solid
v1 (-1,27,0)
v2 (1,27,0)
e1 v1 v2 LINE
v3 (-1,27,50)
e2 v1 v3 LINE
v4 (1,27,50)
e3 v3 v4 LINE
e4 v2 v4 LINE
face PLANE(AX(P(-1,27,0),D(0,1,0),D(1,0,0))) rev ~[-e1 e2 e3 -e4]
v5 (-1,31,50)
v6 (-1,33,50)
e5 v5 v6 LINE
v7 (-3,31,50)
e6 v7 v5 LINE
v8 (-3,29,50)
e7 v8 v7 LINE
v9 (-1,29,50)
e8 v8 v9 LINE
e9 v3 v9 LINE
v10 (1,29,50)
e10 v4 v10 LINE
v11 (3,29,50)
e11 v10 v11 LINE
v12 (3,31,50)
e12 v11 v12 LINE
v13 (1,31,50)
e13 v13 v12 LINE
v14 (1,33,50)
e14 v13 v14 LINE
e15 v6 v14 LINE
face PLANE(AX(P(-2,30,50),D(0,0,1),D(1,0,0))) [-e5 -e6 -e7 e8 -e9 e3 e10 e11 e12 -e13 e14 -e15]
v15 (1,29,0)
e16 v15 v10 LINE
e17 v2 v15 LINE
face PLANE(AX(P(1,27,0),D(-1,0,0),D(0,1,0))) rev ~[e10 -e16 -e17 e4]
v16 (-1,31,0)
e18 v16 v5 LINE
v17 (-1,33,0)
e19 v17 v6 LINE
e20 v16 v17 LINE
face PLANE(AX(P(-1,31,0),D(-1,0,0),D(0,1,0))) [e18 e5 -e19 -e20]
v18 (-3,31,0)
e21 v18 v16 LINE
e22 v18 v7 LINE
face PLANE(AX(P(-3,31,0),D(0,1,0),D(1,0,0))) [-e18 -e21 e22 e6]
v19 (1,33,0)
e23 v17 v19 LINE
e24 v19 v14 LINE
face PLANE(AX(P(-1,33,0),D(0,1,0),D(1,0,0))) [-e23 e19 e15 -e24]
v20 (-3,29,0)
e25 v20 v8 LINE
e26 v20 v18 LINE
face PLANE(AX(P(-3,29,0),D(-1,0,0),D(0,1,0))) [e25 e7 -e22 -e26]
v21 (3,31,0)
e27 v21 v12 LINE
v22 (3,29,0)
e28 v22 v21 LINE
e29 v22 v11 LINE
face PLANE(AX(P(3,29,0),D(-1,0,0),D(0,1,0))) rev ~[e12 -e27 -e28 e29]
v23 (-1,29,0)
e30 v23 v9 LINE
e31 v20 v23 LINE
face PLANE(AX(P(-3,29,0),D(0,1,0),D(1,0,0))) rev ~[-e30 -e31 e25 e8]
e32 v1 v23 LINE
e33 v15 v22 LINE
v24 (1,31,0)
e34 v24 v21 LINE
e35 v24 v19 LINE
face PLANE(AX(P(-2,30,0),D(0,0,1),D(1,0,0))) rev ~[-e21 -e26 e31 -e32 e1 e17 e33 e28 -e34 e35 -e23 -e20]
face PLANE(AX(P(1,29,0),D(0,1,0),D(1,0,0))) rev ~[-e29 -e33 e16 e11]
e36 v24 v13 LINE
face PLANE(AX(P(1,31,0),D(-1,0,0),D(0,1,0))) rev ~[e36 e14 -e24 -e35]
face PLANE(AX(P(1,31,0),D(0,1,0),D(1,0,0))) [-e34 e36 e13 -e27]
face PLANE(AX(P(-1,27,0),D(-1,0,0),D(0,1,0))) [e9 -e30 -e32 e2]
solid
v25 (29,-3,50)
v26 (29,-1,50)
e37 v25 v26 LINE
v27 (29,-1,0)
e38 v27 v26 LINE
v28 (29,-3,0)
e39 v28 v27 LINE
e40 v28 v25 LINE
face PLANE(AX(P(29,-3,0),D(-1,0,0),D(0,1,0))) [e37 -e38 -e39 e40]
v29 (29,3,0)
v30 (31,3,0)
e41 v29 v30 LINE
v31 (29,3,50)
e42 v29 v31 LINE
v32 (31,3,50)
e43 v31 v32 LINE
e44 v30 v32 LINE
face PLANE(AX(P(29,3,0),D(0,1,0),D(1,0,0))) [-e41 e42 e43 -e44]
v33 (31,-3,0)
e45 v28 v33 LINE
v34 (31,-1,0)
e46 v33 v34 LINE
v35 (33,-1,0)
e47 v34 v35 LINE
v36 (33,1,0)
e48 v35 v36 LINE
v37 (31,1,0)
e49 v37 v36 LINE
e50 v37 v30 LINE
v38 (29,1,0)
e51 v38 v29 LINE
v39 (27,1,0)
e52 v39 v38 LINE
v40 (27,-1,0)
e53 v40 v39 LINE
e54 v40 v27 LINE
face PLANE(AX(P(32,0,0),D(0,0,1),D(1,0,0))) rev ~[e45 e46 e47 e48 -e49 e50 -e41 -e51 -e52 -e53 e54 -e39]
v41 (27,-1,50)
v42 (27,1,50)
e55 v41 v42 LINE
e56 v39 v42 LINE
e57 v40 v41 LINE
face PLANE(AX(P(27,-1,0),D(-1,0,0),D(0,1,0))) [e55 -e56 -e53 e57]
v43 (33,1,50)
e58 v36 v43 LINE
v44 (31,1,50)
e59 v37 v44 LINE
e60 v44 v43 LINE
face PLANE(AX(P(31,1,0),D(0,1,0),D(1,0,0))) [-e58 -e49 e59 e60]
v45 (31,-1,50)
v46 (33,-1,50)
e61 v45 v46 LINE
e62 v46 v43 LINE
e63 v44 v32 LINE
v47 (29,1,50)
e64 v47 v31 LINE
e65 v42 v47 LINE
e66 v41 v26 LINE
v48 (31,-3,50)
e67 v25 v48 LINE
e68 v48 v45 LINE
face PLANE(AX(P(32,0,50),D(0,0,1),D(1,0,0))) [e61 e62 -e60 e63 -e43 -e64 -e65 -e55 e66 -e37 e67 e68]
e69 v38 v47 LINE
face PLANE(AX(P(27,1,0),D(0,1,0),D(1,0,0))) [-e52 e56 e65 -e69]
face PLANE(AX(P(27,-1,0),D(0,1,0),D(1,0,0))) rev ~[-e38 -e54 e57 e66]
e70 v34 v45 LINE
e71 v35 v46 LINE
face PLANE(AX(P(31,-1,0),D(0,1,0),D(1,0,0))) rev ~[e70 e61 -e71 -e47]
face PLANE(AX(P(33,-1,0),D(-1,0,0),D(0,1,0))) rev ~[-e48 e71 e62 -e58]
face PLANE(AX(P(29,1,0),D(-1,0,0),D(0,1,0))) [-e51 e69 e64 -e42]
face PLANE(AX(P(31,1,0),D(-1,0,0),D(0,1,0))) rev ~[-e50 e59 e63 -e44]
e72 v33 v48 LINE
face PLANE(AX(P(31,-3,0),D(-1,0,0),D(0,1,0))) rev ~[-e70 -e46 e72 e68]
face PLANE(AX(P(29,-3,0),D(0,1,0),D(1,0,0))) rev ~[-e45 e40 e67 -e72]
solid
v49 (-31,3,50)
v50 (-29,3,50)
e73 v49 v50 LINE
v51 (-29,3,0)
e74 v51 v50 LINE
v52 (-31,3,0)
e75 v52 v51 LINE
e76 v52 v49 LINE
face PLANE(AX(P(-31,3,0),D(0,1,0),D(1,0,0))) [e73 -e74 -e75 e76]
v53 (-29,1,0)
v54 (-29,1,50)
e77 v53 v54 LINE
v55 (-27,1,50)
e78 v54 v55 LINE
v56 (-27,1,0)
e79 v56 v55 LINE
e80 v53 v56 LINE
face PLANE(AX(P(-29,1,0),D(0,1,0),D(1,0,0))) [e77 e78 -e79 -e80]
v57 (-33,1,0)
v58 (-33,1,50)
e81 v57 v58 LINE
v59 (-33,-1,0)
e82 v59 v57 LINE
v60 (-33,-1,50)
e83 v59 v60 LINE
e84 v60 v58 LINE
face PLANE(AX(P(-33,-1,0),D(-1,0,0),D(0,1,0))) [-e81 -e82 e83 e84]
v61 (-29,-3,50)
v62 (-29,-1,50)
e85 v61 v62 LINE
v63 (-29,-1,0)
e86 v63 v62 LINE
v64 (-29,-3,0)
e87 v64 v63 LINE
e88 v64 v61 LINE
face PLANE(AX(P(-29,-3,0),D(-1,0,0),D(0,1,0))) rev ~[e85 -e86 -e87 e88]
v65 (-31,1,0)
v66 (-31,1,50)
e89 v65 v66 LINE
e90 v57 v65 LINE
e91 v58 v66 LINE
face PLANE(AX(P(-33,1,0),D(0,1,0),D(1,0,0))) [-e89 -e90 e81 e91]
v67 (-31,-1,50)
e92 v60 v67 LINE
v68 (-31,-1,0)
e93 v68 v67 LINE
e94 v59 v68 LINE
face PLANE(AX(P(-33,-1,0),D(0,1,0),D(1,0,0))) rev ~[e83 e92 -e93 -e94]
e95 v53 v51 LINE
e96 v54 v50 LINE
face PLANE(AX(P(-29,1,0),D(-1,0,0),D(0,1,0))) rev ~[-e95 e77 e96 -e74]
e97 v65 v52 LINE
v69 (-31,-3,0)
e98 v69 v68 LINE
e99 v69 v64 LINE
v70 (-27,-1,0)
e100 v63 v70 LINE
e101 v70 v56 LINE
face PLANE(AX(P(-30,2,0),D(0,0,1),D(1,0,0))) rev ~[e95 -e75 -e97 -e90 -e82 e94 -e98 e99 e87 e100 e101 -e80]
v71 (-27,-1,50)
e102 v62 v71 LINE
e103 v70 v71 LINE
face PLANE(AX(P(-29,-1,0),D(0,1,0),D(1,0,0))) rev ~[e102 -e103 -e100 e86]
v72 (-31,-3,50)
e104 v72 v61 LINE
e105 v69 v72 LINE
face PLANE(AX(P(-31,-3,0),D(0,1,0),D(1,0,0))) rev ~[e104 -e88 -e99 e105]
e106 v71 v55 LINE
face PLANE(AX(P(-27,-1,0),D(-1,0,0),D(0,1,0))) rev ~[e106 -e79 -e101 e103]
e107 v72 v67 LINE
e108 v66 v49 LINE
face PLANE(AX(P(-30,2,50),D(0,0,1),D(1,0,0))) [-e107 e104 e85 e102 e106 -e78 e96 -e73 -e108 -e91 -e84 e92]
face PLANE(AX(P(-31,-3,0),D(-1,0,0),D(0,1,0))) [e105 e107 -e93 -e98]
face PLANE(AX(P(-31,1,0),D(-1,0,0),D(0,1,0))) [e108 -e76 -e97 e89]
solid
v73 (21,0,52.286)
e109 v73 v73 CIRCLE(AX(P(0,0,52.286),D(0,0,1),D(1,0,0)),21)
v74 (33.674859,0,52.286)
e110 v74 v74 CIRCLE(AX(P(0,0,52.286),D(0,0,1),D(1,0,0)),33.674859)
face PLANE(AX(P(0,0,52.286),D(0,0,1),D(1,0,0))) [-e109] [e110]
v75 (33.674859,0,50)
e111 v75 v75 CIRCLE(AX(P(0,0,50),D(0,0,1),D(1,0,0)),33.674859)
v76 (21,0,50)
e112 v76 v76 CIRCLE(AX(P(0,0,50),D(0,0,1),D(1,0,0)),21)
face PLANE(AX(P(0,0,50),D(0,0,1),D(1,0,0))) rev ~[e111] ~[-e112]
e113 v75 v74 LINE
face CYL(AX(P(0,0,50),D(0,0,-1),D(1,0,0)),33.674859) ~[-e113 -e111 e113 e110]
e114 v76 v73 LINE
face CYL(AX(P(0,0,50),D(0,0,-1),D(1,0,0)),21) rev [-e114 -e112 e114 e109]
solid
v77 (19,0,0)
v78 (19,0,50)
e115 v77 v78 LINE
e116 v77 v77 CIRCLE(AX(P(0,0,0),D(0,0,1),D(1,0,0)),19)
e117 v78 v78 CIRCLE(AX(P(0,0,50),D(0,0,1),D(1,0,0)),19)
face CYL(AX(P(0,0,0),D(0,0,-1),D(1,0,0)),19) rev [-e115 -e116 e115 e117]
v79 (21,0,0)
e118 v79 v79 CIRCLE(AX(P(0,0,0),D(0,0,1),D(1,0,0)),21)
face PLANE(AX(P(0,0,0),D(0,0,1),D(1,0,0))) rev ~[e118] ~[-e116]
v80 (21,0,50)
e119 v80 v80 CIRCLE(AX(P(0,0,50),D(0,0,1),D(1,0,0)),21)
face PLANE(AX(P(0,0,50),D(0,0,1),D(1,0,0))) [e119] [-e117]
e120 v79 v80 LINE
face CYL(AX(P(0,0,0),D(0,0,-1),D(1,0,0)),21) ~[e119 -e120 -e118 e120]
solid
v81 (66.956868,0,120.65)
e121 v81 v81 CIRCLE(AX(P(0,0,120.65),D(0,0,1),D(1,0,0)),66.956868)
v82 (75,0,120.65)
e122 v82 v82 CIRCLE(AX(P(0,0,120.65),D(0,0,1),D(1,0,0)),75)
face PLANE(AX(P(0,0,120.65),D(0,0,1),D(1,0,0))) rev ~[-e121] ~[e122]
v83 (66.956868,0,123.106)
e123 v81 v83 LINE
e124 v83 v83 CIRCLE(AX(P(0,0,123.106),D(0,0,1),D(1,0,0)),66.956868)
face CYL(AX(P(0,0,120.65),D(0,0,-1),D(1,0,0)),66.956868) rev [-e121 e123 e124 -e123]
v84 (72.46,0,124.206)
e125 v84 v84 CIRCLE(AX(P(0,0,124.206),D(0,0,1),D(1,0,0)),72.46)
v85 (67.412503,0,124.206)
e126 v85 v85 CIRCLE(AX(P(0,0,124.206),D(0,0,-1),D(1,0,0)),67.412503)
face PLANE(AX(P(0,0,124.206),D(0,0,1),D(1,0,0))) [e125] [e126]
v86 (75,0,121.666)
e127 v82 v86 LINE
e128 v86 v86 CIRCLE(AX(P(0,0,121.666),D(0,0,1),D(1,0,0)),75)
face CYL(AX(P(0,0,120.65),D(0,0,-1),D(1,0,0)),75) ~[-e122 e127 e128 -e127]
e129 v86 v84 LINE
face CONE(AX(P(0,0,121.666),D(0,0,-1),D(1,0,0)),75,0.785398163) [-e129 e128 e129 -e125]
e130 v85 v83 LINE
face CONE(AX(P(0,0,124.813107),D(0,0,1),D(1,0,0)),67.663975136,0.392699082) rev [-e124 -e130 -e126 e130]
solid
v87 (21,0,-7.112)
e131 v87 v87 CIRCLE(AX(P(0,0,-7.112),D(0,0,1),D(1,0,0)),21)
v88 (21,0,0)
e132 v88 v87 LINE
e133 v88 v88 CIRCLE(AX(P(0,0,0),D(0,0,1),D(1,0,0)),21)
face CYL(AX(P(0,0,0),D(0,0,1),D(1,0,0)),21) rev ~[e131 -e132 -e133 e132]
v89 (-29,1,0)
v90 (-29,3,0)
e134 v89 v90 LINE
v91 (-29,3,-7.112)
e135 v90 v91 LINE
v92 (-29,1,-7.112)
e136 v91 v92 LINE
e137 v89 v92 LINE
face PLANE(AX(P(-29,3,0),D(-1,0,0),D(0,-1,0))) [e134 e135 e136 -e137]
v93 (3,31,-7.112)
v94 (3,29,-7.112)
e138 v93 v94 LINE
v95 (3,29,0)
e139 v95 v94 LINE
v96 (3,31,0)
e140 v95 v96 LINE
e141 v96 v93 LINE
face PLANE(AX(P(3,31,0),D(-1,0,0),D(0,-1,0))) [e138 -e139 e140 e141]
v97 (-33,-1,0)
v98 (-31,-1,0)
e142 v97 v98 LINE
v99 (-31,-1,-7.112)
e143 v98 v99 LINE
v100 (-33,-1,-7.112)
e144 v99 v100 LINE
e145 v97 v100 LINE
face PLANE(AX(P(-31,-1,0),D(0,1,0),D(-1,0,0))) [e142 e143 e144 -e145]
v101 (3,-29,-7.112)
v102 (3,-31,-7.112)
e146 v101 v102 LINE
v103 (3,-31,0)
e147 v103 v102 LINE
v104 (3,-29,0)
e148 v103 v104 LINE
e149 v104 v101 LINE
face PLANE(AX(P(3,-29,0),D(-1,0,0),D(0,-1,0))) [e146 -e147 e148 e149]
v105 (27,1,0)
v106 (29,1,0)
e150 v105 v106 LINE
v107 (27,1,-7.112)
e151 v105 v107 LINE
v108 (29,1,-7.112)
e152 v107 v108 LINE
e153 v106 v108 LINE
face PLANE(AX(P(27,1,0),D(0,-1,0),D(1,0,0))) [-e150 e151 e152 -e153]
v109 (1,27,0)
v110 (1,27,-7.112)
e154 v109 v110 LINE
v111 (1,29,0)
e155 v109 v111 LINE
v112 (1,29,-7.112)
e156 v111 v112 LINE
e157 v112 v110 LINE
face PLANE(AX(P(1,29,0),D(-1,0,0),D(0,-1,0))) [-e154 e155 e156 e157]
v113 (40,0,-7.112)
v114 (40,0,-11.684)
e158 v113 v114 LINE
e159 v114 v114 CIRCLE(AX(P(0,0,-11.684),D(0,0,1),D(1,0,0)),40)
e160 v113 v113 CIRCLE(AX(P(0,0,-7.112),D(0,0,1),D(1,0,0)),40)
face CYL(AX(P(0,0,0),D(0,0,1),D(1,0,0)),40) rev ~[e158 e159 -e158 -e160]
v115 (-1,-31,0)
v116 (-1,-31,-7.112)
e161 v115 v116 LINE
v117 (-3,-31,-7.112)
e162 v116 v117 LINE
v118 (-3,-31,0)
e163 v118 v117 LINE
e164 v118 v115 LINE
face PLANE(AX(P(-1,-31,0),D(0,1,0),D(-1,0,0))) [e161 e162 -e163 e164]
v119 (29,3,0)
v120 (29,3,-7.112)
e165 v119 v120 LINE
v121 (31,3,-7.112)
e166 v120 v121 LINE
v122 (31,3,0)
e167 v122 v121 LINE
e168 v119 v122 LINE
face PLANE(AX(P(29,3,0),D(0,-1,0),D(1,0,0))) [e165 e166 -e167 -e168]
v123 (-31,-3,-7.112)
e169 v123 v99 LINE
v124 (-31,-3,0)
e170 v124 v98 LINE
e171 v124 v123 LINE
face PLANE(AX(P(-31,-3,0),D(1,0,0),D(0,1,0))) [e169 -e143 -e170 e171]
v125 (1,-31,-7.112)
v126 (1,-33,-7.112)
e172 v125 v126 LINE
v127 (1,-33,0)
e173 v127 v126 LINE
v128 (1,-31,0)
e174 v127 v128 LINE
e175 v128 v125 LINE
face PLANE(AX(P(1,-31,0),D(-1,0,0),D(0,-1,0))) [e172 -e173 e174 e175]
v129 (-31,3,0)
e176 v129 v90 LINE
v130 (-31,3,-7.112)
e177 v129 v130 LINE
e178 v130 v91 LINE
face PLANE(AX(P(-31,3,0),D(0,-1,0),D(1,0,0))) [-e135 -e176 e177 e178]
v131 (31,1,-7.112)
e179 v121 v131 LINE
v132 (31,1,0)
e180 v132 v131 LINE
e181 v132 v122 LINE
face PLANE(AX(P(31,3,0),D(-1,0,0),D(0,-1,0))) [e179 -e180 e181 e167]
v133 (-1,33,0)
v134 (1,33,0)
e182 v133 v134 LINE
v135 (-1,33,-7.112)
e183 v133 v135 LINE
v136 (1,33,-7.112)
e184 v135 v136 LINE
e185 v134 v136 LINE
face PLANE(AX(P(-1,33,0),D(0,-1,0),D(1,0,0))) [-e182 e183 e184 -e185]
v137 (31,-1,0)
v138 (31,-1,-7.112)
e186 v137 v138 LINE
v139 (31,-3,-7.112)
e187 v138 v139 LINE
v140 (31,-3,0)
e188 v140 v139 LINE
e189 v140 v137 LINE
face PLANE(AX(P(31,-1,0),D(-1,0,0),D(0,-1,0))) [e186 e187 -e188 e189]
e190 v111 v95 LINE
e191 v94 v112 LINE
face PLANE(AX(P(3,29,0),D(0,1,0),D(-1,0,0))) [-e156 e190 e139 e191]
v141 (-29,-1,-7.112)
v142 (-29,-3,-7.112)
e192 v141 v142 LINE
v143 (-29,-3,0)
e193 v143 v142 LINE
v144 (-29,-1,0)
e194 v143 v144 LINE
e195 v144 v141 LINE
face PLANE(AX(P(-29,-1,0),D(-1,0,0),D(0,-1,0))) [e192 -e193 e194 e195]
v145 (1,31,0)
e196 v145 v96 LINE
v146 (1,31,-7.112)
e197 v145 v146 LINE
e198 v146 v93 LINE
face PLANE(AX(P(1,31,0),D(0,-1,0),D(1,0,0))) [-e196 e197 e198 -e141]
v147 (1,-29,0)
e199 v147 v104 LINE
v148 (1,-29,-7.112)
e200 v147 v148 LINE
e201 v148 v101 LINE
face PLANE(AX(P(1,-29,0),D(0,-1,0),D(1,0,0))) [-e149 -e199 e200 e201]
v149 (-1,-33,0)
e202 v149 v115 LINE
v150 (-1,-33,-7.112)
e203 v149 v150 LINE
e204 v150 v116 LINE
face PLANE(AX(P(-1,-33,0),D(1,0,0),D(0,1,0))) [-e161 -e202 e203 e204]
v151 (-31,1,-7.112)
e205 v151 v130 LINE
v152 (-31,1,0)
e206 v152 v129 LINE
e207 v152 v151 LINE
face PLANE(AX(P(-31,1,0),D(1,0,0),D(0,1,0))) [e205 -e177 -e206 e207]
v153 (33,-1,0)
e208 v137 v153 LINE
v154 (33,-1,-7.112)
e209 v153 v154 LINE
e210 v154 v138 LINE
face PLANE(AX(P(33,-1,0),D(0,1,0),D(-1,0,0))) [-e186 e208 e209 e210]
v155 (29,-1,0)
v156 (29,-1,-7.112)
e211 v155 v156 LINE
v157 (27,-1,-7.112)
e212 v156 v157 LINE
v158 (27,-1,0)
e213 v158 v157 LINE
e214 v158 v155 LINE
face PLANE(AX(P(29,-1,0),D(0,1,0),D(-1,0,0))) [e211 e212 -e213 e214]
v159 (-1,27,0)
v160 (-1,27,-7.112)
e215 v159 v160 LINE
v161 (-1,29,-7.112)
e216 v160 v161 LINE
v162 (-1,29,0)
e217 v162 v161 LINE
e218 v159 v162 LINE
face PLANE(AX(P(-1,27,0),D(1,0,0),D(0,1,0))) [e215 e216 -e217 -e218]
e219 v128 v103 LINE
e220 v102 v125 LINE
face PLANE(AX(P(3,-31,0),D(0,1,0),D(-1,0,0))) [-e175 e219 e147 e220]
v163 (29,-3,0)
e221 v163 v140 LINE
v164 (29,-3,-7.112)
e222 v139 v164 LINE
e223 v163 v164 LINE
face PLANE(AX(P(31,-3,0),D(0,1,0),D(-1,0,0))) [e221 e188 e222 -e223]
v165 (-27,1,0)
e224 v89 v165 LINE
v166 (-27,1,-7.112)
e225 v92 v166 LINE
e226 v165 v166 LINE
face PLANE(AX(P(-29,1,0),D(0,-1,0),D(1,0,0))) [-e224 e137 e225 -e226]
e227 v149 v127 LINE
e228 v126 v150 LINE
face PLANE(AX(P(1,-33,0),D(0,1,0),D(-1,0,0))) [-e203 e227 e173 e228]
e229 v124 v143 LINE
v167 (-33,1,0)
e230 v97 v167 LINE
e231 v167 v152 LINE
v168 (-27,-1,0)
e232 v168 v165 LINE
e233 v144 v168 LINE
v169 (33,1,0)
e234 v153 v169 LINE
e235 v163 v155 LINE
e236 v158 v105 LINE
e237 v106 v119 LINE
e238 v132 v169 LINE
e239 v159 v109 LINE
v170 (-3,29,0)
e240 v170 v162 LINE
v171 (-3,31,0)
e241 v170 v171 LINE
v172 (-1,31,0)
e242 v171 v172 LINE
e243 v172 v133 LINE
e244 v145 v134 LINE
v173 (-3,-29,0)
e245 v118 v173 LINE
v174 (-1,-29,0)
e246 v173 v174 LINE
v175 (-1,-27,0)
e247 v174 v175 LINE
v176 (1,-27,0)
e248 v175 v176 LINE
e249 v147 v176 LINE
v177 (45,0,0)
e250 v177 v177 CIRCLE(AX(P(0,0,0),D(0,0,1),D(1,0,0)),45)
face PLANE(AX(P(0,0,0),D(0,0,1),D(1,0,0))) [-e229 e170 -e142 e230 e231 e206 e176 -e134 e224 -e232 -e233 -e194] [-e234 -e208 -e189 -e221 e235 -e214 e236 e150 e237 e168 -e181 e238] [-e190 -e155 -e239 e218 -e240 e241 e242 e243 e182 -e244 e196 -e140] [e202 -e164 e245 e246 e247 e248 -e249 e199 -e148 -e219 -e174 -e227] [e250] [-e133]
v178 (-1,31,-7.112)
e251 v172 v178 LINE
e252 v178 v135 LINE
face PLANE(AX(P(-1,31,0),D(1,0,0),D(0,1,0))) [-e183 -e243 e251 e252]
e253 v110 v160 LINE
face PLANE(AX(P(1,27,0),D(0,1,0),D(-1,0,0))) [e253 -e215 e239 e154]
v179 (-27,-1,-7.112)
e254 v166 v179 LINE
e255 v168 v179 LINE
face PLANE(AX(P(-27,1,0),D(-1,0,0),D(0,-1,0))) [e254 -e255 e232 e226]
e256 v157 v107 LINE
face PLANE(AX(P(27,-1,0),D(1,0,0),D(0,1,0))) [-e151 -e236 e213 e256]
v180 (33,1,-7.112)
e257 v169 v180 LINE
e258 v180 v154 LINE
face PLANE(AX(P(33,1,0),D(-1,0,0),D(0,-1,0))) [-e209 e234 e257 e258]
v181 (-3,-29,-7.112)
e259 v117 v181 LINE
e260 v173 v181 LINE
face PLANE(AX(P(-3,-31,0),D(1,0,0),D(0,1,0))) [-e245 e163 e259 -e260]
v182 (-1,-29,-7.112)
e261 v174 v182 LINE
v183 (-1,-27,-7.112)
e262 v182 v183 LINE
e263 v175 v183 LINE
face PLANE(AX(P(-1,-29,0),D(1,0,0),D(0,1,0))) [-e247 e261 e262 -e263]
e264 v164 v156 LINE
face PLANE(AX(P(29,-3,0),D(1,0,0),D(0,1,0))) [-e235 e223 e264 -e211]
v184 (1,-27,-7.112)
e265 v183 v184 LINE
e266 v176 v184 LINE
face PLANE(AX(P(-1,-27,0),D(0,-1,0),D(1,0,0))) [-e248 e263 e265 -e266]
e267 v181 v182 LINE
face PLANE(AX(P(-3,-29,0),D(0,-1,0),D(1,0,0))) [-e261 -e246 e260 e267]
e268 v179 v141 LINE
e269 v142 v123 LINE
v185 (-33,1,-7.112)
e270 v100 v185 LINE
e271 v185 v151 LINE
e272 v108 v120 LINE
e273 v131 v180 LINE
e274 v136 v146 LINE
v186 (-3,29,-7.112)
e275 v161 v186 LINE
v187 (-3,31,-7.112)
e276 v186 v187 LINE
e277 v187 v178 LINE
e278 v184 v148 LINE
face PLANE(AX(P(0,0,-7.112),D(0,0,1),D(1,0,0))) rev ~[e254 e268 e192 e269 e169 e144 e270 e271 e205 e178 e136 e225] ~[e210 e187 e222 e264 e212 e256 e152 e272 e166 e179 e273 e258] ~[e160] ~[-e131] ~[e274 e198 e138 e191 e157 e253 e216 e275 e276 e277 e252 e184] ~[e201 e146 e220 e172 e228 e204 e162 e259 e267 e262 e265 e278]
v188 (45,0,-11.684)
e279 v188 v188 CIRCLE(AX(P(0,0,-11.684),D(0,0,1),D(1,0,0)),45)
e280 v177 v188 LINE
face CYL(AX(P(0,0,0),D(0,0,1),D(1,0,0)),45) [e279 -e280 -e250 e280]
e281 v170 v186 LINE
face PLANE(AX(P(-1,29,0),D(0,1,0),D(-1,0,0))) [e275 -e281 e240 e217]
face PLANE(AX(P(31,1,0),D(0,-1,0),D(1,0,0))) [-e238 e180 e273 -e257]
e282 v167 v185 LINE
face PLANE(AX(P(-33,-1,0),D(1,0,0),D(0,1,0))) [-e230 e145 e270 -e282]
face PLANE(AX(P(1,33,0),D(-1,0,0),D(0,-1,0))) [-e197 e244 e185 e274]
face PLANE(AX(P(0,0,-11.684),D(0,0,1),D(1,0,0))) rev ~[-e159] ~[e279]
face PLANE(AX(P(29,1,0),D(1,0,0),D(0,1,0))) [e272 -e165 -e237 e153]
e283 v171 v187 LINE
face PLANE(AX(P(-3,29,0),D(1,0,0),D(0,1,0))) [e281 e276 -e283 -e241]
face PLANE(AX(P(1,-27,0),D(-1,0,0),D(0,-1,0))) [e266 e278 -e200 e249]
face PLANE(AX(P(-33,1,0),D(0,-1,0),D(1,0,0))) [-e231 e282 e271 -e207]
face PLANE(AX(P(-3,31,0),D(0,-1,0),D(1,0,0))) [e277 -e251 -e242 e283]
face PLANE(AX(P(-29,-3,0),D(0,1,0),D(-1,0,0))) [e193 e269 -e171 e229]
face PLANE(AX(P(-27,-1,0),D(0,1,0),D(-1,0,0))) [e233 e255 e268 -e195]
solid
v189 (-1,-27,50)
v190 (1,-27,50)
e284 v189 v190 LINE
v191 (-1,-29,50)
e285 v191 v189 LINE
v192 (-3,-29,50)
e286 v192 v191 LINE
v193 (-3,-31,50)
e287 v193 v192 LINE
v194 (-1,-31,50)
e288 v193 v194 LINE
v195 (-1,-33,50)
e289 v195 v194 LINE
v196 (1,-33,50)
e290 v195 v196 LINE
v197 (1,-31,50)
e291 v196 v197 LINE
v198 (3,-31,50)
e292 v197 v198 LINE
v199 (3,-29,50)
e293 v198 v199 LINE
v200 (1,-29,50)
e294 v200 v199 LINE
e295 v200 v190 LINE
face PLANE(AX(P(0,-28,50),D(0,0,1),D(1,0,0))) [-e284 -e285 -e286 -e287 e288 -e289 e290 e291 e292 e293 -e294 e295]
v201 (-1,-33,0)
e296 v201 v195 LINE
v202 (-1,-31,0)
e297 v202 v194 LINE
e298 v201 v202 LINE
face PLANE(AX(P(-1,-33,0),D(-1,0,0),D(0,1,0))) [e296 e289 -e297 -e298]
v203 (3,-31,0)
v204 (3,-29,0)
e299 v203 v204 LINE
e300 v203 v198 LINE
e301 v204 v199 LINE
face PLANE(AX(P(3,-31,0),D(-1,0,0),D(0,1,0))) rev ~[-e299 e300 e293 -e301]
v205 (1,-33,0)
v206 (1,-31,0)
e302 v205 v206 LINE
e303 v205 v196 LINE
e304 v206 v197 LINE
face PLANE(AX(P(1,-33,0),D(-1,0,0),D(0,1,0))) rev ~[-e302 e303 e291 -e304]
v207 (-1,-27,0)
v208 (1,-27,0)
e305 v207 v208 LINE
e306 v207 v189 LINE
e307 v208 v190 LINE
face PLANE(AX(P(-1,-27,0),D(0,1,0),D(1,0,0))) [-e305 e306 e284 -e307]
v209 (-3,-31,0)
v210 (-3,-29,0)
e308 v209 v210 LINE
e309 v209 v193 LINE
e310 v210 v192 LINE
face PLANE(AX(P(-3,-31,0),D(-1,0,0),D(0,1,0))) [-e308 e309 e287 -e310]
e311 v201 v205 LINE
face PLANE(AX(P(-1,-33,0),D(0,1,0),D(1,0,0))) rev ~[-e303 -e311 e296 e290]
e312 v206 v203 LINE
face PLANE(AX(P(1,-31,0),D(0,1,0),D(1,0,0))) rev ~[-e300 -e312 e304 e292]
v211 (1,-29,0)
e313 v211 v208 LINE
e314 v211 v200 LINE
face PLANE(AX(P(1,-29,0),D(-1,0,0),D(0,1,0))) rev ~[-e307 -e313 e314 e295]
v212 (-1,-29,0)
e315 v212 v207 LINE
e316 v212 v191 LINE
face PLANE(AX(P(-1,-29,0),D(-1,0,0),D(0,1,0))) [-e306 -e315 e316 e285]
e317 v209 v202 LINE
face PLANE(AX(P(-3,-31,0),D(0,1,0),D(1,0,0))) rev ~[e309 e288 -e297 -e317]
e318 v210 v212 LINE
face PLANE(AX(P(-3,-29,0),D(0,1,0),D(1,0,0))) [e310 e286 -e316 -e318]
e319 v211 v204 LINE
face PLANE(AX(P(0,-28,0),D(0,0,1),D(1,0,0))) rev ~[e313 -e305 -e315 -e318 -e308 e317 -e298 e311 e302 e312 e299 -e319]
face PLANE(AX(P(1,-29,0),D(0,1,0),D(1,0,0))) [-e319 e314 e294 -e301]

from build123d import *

# Parameters (mm, degrees)
F0_W      = 2
F0_H      = 2
F1_DEPTH  = 50
F0_R      = 21
F0_R_2    = 19
F2_DEPTH  = 50
F3_R      = 33.6748592908
F3_R_2    = 21
F4_DEPTH  = 2.286
F0_R_3    = 10.9886150932
F5_DEPTH  = 120.65
F6_R      = 75
F6_R_2    = 66.9568683552
F7_DEPTH  = 3.556
F0_R_4    = 45
F0_R_5    = 40
F11_DEPTH = 11.684
F12_DEPTH = 7.112
F13_SIZE  = 2.54
F14_SIZE  = 0.1


# Not quite as in the source:
# - a fillet or chamfer that OpenCascade refuses, or shapes differently, is made with other operations: its cross-section is extruded or revolved along the edge and cut away or added
# - the program builds the solid bodies; features that only make, move or delete a surface that nothing else refers to are left out


with BuildPart() as f1:
    # F0 (on Top) → F1 (new body)
    with BuildSketch(Plane.XY):
        with Locations((-2, 30)):
            Rectangle(F0_W, F0_H)
        with Locations((0, 32)):
            Rectangle(F0_W, F0_H)
        with Locations((2, 30)):
            Rectangle(F0_W, F0_H)
        with Locations((0, 28)):
            Rectangle(F0_W, F0_H)
        with Locations((0, 30)):
            Rectangle(F0_W, F0_H)
    extrude(amount=F1_DEPTH)



with BuildPart() as f1b:
    # F0 (on Top) → F1, piece 2 (new body)
    with BuildSketch(Plane.XY):
        with Locations((32, 0)):
            Rectangle(F0_W, F0_H)
        with Locations((28, 0)):
            Rectangle(F0_W, F0_H)
        with Locations((30, -2)):
            Rectangle(F0_W, F0_H)
        with Locations((30, 2)):
            Rectangle(F0_W, F0_H)
        with Locations((30, 0)):
            Rectangle(F0_W, F0_H)
    extrude(amount=F1_DEPTH)


with BuildPart() as f1c:
    # F0 (on Top) → F1, piece 3 (new body)
    with BuildSketch(Plane.XY):
        with Locations((0, -28)):
            Rectangle(F0_W, F0_H)
        with Locations((2, -30)):
            Rectangle(F0_W, F0_H)
        with Locations((-2, -30)):
            Rectangle(F0_W, F0_H)
        with Locations((0, -32)):
            Rectangle(F0_W, F0_H)
        with Locations((0, -30)):
            Rectangle(F0_W, F0_H)
    extrude(amount=F1_DEPTH)


with BuildPart() as f1d:
    # F0 (on Top) → F1, piece 4 (new body)
    with BuildSketch(Plane.XY):
        with Locations((-30, 2)):
            Rectangle(F0_W, F0_H)
        with Locations((-32, 0)):
            Rectangle(F0_W, F0_H)
        with Locations((-28, 0)):
            Rectangle(F0_W, F0_H)
        with Locations((-30, -2)):
            Rectangle(F0_W, F0_H)
        with Locations((-30, 0)):
            Rectangle(F0_W, F0_H)
    extrude(amount=F1_DEPTH)


with BuildPart() as f2:
    # F0 (on Top) → F2 (new body)
    with BuildSketch(Plane.XY):
        Circle(F0_R)
        Circle(F0_R_2, mode=Mode.SUBTRACT)
    extrude(amount=F2_DEPTH)


with BuildPart() as f4:
    # F3 (on face) → F4 (new body)
    with BuildSketch(Plane.XY.offset(50)):
        Circle(F3_R)
        Circle(F3_R_2, mode=Mode.SUBTRACT)
    extrude(amount=F4_DEPTH)


with BuildPart() as f5:
    # F0 (on Top) → F5 (new body)
    with BuildSketch(Plane.XY):
        Circle(F0_R_3)
    extrude(amount=F5_DEPTH)


with BuildPart() as f7:
    # F6 (on face) → F7 (new body)
    with BuildSketch(Plane.XY.offset(120.65)):
        Circle(F6_R)
        Circle(F6_R_2, mode=Mode.SUBTRACT)
    extrude(amount=F7_DEPTH)

    # F13
    f13_edges = [f7.edges().sort_by_distance(p)[0] for p in [
        (-75, 0, 124.206),
    ]]
    chamfer(f13_edges, length=F13_SIZE)

    # F14
    f14_edges = [f7.edges().sort_by_distance(p)[0] for p in [
        (-66.956868, 0, 124.206),
    ]]
    chamfer(f14_edges, length=F14_SIZE)

    # F15: chamfer of 1 on 1 edges, made by hand

    # F15_s1 → F15_t2 (revolve, cut)
    with BuildSketch(Plane.XZ):
        Polygon((67.6639751364, 124.8131067812), (66.9568683552, 123.106), (66.9568683552, 124.106), align=None)
    revolve(axis=Axis((0, 0, 124.106), (0, 0, 1)), mode=Mode.SUBTRACT)


with BuildPart() as f11:
    # F0 (on Top) → F11 (new body)
    with BuildSketch(Plane.XY):
        Circle(F0_R_4)
        Circle(F0_R_5, mode=Mode.SUBTRACT)
    extrude(amount=-F11_DEPTH)


with BuildPart() as f1_1:
    add(f1.part)

    add(f1b.part)  # F12 merges F1b

    add(f1c.part)  # F12 merges F1c

    add(f1d.part)  # F12 merges F1d

    add(f2.part)  # F12 merges F2

    add(f11.part)  # F12 merges F11
    # F0 (on Top) → F12 (join)
    with BuildSketch(Plane.XY):
        Circle(F0_R_5)
        Polygon((-1, -29), (-1, -27), (1, -27), (1, -29), (3, -29), (3, -31), (1, -31), (1, -33), (-1, -33), (-1, -31), (-3, -31), (-3, -29), align=None, mode=Mode.SUBTRACT)
        Polygon((-29, 1), (-27, 1), (-27, -1), (-29, -1), (-29, -3), (-31, -3), (-31, -1), (-33, -1), (-33, 1), (-31, 1), (-31, 3), (-29, 3), align=None, mode=Mode.SUBTRACT)
        Circle(F0_R, mode=Mode.SUBTRACT)
        Polygon((29, -1), (27, -1), (27, 1), (29, 1), (29, 3), (31, 3), (31, 1), (33, 1), (33, -1), (31, -1), (31, -3), (29, -3), align=None, mode=Mode.SUBTRACT)
        Polygon((3, 31), (3, 29), (1, 29), (1, 27), (-1, 27), (-1, 29), (-3, 29), (-3, 31), (-1, 31), (-1, 33), (1, 33), (1, 31), align=None, mode=Mode.SUBTRACT)
    extrude(amount=-F12_DEPTH)


solid = Compound([f4.part, f7.part, f1_1.part])
